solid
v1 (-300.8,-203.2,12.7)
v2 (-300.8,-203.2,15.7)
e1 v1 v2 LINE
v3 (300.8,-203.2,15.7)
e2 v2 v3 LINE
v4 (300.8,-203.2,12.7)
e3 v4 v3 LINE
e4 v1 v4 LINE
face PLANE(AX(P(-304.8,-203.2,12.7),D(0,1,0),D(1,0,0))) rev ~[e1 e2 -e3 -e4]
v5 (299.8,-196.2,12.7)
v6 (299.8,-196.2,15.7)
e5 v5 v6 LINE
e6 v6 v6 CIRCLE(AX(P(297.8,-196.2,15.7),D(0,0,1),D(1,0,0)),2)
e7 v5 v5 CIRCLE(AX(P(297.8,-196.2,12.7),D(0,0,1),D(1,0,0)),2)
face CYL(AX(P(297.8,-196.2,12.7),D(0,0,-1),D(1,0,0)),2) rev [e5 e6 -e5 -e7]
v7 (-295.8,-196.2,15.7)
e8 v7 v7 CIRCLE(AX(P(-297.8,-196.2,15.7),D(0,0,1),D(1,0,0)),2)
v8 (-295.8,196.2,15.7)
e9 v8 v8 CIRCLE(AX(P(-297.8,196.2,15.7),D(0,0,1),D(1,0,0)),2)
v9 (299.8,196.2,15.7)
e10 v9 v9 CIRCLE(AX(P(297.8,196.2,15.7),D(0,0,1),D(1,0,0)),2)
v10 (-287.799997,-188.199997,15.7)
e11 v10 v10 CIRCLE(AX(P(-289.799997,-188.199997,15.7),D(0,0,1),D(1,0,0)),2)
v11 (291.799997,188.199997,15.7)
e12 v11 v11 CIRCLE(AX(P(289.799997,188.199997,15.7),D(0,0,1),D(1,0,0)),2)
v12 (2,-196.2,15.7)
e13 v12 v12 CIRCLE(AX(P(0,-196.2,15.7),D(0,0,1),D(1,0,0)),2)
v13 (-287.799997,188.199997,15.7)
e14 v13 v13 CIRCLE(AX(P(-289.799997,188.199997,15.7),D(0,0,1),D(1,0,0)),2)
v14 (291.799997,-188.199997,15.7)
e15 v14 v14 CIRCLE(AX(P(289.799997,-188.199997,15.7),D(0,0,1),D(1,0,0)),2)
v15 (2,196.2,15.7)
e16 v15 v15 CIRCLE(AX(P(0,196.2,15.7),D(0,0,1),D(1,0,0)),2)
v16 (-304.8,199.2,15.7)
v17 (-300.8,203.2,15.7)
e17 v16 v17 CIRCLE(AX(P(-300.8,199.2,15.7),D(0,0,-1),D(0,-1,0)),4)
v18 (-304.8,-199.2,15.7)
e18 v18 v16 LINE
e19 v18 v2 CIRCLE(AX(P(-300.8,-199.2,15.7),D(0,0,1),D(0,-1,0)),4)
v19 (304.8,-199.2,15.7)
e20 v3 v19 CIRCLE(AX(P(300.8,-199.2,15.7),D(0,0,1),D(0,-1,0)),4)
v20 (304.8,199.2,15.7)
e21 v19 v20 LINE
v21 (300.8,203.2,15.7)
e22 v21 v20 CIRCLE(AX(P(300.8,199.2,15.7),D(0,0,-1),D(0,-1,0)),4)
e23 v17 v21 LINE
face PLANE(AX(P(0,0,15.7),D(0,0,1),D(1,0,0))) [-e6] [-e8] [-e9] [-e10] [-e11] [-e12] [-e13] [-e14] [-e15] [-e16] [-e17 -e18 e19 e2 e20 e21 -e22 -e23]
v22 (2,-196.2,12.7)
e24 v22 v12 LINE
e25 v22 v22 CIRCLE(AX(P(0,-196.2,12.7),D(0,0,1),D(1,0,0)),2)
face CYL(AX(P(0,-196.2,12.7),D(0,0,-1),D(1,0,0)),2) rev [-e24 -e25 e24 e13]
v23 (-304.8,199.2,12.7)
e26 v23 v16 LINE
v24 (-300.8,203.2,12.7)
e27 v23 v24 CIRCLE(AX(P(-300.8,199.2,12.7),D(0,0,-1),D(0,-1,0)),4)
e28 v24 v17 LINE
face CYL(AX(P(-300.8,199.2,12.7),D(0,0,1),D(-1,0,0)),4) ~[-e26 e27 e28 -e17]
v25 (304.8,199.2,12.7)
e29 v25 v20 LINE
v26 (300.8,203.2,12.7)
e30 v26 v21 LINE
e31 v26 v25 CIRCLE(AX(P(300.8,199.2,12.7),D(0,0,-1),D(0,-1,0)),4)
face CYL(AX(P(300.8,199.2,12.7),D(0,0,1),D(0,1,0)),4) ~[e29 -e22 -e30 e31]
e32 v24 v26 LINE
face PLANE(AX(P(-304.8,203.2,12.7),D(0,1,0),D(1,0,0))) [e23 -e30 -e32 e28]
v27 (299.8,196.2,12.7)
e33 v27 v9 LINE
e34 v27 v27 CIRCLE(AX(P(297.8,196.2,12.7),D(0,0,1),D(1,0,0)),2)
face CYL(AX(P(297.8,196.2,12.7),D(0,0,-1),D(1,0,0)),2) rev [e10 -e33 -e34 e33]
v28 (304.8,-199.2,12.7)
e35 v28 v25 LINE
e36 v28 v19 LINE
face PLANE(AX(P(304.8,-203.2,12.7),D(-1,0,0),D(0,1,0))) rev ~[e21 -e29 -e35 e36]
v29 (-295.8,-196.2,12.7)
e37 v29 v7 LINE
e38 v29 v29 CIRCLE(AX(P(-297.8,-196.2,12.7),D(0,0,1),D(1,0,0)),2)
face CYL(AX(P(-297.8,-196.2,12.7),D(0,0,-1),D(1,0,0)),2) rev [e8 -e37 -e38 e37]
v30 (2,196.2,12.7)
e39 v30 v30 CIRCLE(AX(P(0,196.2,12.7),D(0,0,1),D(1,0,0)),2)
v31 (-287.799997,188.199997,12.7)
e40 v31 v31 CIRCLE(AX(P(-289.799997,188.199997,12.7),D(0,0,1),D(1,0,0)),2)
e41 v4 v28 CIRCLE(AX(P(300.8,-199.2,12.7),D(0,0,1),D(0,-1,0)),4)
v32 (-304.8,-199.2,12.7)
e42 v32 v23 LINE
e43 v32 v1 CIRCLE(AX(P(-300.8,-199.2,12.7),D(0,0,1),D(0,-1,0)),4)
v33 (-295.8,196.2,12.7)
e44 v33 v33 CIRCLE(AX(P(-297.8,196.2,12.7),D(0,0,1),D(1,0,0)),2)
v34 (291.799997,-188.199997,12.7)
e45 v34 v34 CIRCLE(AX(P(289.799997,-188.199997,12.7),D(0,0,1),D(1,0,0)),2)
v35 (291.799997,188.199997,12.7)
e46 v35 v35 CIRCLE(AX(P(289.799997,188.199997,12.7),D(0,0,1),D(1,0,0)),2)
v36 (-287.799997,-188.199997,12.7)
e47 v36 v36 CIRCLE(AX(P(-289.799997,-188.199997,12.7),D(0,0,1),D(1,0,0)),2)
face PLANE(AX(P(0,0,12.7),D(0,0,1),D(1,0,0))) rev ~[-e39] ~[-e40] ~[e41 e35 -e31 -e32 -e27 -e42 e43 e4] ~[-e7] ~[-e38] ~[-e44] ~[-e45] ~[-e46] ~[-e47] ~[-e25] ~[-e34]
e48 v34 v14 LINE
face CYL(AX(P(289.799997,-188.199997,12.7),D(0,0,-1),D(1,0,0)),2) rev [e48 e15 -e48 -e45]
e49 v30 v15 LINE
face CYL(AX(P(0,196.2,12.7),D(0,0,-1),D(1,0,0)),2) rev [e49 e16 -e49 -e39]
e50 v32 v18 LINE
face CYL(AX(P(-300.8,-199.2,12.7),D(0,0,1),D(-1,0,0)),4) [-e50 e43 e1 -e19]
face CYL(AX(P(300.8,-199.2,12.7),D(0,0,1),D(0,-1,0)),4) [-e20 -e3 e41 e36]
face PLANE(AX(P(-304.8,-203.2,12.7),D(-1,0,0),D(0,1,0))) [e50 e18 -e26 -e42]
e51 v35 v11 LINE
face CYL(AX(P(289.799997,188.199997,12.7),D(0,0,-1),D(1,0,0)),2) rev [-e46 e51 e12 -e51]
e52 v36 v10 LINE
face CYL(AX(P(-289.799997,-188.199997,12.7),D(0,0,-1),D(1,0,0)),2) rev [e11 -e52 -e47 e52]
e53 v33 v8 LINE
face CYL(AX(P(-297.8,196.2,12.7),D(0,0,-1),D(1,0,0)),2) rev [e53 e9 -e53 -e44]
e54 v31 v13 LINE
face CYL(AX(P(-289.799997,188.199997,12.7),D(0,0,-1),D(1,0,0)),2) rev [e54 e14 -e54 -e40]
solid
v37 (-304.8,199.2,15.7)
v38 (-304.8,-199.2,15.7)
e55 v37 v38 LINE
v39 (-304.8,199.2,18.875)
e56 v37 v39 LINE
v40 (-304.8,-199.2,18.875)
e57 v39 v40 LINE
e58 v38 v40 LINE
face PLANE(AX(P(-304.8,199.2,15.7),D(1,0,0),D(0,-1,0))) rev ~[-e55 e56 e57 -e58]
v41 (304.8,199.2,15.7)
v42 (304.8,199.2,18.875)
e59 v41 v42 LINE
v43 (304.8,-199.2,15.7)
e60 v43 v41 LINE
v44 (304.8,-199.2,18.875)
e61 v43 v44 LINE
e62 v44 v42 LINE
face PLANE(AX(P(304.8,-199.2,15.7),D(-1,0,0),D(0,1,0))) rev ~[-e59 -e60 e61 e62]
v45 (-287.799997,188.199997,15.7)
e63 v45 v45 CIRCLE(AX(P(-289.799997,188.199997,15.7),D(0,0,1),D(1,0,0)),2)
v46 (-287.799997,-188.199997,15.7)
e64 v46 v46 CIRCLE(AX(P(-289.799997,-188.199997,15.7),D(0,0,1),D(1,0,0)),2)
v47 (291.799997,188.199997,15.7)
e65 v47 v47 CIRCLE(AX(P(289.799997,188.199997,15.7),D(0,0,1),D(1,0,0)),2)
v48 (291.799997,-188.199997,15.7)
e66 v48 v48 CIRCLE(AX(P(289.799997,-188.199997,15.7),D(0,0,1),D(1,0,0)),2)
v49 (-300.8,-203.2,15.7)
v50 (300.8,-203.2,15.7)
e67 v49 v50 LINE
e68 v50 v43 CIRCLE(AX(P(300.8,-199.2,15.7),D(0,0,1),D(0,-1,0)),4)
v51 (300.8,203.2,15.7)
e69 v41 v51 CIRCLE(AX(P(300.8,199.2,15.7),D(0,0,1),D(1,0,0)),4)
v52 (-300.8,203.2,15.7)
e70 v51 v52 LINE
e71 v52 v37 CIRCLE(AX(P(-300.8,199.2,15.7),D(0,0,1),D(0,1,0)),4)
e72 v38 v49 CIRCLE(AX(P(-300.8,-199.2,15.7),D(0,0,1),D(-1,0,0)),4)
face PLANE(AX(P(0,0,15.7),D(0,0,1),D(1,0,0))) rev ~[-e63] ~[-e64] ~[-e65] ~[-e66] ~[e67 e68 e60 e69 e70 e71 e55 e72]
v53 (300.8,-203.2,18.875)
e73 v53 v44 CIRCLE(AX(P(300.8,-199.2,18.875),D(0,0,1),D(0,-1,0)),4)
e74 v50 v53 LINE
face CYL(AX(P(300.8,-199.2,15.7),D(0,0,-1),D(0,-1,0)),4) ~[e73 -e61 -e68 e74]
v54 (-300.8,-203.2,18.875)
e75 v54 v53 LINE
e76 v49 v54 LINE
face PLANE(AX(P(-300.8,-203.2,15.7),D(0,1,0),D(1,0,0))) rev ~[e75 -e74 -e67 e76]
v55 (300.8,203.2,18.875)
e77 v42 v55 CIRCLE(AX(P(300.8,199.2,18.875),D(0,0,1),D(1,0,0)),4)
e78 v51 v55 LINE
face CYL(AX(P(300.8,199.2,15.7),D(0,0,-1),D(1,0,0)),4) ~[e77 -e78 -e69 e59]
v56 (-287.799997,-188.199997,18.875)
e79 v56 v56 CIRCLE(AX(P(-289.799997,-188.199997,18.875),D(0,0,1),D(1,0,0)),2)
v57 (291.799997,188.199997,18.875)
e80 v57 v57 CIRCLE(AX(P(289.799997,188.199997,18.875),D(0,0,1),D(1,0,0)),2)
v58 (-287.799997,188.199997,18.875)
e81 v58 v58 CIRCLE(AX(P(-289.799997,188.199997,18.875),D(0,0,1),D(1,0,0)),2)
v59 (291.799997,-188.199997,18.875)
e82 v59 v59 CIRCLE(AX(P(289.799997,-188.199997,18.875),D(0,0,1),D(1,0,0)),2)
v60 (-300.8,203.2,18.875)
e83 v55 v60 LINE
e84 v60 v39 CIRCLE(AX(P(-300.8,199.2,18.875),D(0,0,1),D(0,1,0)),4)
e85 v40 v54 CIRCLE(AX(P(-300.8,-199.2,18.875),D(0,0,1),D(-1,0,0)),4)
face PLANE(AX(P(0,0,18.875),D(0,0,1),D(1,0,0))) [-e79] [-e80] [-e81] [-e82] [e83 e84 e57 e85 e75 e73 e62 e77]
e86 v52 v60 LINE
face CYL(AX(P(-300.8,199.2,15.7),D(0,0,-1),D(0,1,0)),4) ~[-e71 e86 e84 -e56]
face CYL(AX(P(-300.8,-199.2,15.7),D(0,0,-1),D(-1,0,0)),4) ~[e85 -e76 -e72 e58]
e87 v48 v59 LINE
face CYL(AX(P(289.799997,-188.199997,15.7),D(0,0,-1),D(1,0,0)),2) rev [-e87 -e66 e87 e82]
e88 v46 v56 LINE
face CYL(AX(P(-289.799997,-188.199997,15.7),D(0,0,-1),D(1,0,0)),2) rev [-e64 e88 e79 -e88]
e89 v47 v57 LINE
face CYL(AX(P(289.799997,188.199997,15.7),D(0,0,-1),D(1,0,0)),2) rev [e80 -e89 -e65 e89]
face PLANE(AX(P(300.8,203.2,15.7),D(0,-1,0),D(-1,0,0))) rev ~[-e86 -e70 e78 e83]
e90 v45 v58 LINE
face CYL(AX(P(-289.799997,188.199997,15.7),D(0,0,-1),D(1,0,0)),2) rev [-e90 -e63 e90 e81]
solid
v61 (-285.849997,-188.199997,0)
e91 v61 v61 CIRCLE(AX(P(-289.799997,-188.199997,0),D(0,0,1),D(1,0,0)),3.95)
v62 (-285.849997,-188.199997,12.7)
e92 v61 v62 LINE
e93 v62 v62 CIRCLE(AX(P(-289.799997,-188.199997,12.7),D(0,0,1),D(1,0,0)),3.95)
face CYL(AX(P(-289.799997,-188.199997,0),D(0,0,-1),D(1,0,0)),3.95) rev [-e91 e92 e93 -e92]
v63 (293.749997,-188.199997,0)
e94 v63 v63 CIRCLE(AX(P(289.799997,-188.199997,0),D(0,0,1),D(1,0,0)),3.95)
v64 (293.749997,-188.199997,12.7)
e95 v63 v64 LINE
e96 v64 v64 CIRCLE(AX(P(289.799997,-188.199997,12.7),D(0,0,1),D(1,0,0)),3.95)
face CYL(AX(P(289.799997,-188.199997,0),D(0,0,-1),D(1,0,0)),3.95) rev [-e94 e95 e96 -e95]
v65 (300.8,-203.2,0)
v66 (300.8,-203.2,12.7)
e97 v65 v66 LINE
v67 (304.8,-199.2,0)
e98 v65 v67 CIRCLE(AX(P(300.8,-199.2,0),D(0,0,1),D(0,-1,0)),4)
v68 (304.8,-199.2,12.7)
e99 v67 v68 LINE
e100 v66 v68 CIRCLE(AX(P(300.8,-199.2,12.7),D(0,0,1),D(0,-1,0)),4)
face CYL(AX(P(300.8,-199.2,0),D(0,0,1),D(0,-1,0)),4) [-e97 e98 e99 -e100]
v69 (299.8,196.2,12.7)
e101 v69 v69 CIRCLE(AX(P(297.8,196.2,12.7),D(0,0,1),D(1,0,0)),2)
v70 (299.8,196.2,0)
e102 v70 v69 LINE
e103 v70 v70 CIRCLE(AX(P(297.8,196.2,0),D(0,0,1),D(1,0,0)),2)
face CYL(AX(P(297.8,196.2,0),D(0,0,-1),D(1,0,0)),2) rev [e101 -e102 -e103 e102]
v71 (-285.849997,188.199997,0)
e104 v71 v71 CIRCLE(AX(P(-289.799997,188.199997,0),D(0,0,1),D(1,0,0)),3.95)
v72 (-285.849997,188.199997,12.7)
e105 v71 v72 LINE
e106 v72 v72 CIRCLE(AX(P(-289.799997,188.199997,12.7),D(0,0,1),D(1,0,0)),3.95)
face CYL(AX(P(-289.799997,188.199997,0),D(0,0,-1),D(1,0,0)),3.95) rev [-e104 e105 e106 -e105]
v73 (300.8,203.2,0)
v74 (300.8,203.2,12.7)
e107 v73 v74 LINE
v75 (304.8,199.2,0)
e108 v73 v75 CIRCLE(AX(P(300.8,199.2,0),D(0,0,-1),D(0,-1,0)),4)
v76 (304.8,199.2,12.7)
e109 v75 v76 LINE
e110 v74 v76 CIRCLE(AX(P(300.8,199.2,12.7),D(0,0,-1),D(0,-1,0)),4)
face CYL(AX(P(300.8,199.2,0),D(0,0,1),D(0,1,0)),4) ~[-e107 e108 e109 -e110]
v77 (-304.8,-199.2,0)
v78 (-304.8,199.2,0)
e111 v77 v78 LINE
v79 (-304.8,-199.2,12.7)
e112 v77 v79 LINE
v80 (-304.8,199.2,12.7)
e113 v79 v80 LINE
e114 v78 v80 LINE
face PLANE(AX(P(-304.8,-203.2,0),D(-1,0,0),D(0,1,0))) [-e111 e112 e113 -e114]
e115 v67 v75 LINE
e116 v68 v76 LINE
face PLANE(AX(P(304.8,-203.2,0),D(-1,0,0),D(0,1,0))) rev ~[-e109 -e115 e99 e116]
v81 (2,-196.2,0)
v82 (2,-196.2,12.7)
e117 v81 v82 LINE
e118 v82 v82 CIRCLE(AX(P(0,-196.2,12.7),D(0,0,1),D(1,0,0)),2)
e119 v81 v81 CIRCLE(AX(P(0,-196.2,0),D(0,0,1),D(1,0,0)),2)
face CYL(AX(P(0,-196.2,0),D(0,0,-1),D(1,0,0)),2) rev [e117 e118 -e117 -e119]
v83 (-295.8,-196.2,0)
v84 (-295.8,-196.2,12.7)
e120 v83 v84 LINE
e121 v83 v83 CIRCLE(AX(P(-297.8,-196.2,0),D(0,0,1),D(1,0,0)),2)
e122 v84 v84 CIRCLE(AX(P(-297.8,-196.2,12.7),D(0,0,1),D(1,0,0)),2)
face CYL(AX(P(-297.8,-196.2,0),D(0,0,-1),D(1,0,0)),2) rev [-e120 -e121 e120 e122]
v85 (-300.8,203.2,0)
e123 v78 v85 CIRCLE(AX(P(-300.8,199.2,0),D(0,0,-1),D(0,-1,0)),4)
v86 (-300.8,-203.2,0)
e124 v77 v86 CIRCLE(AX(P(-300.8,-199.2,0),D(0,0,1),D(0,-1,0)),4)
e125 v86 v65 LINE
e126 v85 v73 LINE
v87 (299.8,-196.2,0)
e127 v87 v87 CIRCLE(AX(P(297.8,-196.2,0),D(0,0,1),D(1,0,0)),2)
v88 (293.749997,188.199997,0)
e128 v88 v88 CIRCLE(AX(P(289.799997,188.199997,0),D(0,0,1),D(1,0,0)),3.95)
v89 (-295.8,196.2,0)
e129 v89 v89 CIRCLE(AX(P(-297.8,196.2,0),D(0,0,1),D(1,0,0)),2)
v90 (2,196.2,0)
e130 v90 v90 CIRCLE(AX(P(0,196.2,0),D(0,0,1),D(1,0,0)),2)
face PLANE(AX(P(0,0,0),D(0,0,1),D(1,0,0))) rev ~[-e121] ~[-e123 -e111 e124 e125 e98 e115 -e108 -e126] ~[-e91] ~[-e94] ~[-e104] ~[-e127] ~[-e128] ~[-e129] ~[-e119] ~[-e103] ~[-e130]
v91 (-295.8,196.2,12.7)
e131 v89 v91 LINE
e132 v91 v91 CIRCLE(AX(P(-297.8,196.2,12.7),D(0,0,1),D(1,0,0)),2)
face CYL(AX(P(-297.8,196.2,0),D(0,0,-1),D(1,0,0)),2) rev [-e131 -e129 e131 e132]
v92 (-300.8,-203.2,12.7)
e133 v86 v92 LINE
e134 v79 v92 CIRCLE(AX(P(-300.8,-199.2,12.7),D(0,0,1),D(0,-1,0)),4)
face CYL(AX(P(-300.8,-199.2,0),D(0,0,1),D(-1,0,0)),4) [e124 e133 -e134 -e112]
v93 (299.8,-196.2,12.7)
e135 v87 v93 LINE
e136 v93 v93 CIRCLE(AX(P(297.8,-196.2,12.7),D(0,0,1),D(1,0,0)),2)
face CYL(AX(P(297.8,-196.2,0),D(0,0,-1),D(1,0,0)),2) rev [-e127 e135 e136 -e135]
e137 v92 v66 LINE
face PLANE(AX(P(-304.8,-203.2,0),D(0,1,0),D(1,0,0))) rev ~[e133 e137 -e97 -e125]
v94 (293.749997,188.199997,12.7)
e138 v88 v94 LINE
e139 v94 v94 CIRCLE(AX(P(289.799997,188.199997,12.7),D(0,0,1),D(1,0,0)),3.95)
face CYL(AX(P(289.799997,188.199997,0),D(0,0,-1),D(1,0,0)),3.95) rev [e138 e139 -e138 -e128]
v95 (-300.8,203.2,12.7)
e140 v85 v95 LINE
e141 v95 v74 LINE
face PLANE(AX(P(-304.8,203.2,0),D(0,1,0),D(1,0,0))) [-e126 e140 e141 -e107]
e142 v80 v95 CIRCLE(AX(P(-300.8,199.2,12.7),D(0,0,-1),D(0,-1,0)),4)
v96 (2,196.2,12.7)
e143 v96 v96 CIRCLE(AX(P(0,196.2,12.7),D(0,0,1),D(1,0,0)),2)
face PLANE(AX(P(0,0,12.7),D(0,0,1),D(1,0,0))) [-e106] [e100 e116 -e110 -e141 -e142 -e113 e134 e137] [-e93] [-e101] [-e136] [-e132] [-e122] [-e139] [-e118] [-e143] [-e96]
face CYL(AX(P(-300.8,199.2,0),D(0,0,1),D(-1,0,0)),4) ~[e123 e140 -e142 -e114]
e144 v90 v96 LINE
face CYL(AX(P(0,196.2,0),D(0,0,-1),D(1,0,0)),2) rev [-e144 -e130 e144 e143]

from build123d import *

# Parameters (mm, degrees)
F0_W     = 609.6
F0_H     = 406.4
F0_R     = 2
F0_R_2   = 3.95
F1_DEPTH = 12.7
F2_W     = 609.6
F2_H     = 406.4
F2_R     = 2
F3_DEPTH = 3
F4_R     = 4
F4_2_R   = 4
F5_R     = 2
F6_DEPTH = 3.175


# Not quite as in the source:
# - a length typed as a fraction of an inch, garbled in the dataset ("3 / 203.2 mm" for 3/8 in), is restored


with BuildPart() as f1:
    # F0 (on Top) → F1 (new body)
    with BuildSketch(Plane.XY):
        Rectangle(F0_W, F0_H)
        with Locations((-297.8, -196.2)):
            Circle(F0_R, mode=Mode.SUBTRACT)
        with Locations((-289.7999969482, -188.1999969482)):
            Circle(F0_R_2, mode=Mode.SUBTRACT)
        with Locations((0, -196.2)):
            Circle(F0_R, mode=Mode.SUBTRACT)
        with Locations((297.8, -196.2)):
            Circle(F0_R, mode=Mode.SUBTRACT)
        with Locations((289.7999969482, -188.1999969482)):
            Circle(F0_R_2, mode=Mode.SUBTRACT)
        with Locations((-289.7999969482, 188.1999969482)):
            Circle(F0_R_2, mode=Mode.SUBTRACT)
        with Locations((-297.8, 196.2)):
            Circle(F0_R, mode=Mode.SUBTRACT)
        with Locations((0, 196.2)):
            Circle(F0_R, mode=Mode.SUBTRACT)
        with Locations((289.7999969482, 188.1999969482)):
            Circle(F0_R_2, mode=Mode.SUBTRACT)
        with Locations((297.8, 196.2)):
            Circle(F0_R, mode=Mode.SUBTRACT)
    extrude(amount=F1_DEPTH)

    # F4
    f4_edges = [f1.edges().sort_by_distance(p)[0] for p in [
        (-304.8, -203.2, 6.35),
        (-304.8, 203.2, 6.35),
        (304.8, -203.2, 6.35),
        (304.8, 203.2, 6.35),
    ]]
    fillet(f4_edges, radius=F4_R)


with BuildPart() as f3:
    # F2 (on face) → F3 (new body)
    with BuildSketch(Plane.XY.offset(12.7)):
        Rectangle(F2_W, F2_H)
        with Locations((-297.8, -196.2)):
            Circle(F2_R, mode=Mode.SUBTRACT)
        with Locations((-289.7999969482, -188.1999969482)):
            Circle(F2_R, mode=Mode.SUBTRACT)
        with Locations((0, -196.2)):
            Circle(F2_R, mode=Mode.SUBTRACT)
        with Locations((297.8, -196.2)):
            Circle(F2_R, mode=Mode.SUBTRACT)
        with Locations((289.7999969482, -188.1999969482)):
            Circle(F2_R, mode=Mode.SUBTRACT)
        with Locations((-289.7999969482, 188.1999969482)):
            Circle(F2_R, mode=Mode.SUBTRACT)
        with Locations((-297.8, 196.2)):
            Circle(F2_R, mode=Mode.SUBTRACT)
        with Locations((0, 196.2)):
            Circle(F2_R, mode=Mode.SUBTRACT)
        with Locations((289.7999969482, 188.1999969482)):
            Circle(F2_R, mode=Mode.SUBTRACT)
        with Locations((297.8, 196.2)):
            Circle(F2_R, mode=Mode.SUBTRACT)
    extrude(amount=F3_DEPTH)

    # F4#2
    f4_2_edges = [f3.edges().sort_by_distance(p)[0] for p in [
        (-304.8, -203.2, 14.2),
        (-304.8, 203.2, 14.2),
        (304.8, -203.2, 14.2),
        (304.8, 203.2, 14.2),
    ]]
    fillet(f4_2_edges, radius=F4_2_R)


with BuildPart() as f6:
    # F5 (on face) → F6 (new body)
    with BuildSketch(Plane.XY.offset(15.7)):
        with BuildLine():
            Line((-300.8, -203.2), (300.8, -203.2))
            ThreePointArc((300.8, -203.2), (303.6284271247, -202.0284271247), (304.8, -199.2))
            Line((304.8, -199.2), (304.8, 199.2))
            ThreePointArc((304.8, 199.2), (303.6284271247, 202.0284271247), (300.8, 203.2))
            Line((300.8, 203.2), (-300.8, 203.2))
            ThreePointArc((-300.8, 203.2), (-303.6284271247, 202.0284271247), (-304.8, 199.2))
            Line((-304.8, 199.2), (-304.8, -199.2))
            ThreePointArc((-304.8, -199.2), (-303.6284271247, -202.0284271247), (-300.8, -203.2))
        make_face()
        with Locations((-289.7999969482, -188.1999969482)):
            Circle(F5_R, mode=Mode.SUBTRACT)
        with Locations((289.7999969482, -188.1999969482)):
            Circle(F5_R, mode=Mode.SUBTRACT)
        with Locations((-289.7999969482, 188.1999969482)):
            Circle(F5_R, mode=Mode.SUBTRACT)
        with Locations((289.7999969482, 188.1999969482)):
            Circle(F5_R, mode=Mode.SUBTRACT)
    extrude(amount=F6_DEPTH)


solid = Compound([f1.part, f3.part, f6.part])
